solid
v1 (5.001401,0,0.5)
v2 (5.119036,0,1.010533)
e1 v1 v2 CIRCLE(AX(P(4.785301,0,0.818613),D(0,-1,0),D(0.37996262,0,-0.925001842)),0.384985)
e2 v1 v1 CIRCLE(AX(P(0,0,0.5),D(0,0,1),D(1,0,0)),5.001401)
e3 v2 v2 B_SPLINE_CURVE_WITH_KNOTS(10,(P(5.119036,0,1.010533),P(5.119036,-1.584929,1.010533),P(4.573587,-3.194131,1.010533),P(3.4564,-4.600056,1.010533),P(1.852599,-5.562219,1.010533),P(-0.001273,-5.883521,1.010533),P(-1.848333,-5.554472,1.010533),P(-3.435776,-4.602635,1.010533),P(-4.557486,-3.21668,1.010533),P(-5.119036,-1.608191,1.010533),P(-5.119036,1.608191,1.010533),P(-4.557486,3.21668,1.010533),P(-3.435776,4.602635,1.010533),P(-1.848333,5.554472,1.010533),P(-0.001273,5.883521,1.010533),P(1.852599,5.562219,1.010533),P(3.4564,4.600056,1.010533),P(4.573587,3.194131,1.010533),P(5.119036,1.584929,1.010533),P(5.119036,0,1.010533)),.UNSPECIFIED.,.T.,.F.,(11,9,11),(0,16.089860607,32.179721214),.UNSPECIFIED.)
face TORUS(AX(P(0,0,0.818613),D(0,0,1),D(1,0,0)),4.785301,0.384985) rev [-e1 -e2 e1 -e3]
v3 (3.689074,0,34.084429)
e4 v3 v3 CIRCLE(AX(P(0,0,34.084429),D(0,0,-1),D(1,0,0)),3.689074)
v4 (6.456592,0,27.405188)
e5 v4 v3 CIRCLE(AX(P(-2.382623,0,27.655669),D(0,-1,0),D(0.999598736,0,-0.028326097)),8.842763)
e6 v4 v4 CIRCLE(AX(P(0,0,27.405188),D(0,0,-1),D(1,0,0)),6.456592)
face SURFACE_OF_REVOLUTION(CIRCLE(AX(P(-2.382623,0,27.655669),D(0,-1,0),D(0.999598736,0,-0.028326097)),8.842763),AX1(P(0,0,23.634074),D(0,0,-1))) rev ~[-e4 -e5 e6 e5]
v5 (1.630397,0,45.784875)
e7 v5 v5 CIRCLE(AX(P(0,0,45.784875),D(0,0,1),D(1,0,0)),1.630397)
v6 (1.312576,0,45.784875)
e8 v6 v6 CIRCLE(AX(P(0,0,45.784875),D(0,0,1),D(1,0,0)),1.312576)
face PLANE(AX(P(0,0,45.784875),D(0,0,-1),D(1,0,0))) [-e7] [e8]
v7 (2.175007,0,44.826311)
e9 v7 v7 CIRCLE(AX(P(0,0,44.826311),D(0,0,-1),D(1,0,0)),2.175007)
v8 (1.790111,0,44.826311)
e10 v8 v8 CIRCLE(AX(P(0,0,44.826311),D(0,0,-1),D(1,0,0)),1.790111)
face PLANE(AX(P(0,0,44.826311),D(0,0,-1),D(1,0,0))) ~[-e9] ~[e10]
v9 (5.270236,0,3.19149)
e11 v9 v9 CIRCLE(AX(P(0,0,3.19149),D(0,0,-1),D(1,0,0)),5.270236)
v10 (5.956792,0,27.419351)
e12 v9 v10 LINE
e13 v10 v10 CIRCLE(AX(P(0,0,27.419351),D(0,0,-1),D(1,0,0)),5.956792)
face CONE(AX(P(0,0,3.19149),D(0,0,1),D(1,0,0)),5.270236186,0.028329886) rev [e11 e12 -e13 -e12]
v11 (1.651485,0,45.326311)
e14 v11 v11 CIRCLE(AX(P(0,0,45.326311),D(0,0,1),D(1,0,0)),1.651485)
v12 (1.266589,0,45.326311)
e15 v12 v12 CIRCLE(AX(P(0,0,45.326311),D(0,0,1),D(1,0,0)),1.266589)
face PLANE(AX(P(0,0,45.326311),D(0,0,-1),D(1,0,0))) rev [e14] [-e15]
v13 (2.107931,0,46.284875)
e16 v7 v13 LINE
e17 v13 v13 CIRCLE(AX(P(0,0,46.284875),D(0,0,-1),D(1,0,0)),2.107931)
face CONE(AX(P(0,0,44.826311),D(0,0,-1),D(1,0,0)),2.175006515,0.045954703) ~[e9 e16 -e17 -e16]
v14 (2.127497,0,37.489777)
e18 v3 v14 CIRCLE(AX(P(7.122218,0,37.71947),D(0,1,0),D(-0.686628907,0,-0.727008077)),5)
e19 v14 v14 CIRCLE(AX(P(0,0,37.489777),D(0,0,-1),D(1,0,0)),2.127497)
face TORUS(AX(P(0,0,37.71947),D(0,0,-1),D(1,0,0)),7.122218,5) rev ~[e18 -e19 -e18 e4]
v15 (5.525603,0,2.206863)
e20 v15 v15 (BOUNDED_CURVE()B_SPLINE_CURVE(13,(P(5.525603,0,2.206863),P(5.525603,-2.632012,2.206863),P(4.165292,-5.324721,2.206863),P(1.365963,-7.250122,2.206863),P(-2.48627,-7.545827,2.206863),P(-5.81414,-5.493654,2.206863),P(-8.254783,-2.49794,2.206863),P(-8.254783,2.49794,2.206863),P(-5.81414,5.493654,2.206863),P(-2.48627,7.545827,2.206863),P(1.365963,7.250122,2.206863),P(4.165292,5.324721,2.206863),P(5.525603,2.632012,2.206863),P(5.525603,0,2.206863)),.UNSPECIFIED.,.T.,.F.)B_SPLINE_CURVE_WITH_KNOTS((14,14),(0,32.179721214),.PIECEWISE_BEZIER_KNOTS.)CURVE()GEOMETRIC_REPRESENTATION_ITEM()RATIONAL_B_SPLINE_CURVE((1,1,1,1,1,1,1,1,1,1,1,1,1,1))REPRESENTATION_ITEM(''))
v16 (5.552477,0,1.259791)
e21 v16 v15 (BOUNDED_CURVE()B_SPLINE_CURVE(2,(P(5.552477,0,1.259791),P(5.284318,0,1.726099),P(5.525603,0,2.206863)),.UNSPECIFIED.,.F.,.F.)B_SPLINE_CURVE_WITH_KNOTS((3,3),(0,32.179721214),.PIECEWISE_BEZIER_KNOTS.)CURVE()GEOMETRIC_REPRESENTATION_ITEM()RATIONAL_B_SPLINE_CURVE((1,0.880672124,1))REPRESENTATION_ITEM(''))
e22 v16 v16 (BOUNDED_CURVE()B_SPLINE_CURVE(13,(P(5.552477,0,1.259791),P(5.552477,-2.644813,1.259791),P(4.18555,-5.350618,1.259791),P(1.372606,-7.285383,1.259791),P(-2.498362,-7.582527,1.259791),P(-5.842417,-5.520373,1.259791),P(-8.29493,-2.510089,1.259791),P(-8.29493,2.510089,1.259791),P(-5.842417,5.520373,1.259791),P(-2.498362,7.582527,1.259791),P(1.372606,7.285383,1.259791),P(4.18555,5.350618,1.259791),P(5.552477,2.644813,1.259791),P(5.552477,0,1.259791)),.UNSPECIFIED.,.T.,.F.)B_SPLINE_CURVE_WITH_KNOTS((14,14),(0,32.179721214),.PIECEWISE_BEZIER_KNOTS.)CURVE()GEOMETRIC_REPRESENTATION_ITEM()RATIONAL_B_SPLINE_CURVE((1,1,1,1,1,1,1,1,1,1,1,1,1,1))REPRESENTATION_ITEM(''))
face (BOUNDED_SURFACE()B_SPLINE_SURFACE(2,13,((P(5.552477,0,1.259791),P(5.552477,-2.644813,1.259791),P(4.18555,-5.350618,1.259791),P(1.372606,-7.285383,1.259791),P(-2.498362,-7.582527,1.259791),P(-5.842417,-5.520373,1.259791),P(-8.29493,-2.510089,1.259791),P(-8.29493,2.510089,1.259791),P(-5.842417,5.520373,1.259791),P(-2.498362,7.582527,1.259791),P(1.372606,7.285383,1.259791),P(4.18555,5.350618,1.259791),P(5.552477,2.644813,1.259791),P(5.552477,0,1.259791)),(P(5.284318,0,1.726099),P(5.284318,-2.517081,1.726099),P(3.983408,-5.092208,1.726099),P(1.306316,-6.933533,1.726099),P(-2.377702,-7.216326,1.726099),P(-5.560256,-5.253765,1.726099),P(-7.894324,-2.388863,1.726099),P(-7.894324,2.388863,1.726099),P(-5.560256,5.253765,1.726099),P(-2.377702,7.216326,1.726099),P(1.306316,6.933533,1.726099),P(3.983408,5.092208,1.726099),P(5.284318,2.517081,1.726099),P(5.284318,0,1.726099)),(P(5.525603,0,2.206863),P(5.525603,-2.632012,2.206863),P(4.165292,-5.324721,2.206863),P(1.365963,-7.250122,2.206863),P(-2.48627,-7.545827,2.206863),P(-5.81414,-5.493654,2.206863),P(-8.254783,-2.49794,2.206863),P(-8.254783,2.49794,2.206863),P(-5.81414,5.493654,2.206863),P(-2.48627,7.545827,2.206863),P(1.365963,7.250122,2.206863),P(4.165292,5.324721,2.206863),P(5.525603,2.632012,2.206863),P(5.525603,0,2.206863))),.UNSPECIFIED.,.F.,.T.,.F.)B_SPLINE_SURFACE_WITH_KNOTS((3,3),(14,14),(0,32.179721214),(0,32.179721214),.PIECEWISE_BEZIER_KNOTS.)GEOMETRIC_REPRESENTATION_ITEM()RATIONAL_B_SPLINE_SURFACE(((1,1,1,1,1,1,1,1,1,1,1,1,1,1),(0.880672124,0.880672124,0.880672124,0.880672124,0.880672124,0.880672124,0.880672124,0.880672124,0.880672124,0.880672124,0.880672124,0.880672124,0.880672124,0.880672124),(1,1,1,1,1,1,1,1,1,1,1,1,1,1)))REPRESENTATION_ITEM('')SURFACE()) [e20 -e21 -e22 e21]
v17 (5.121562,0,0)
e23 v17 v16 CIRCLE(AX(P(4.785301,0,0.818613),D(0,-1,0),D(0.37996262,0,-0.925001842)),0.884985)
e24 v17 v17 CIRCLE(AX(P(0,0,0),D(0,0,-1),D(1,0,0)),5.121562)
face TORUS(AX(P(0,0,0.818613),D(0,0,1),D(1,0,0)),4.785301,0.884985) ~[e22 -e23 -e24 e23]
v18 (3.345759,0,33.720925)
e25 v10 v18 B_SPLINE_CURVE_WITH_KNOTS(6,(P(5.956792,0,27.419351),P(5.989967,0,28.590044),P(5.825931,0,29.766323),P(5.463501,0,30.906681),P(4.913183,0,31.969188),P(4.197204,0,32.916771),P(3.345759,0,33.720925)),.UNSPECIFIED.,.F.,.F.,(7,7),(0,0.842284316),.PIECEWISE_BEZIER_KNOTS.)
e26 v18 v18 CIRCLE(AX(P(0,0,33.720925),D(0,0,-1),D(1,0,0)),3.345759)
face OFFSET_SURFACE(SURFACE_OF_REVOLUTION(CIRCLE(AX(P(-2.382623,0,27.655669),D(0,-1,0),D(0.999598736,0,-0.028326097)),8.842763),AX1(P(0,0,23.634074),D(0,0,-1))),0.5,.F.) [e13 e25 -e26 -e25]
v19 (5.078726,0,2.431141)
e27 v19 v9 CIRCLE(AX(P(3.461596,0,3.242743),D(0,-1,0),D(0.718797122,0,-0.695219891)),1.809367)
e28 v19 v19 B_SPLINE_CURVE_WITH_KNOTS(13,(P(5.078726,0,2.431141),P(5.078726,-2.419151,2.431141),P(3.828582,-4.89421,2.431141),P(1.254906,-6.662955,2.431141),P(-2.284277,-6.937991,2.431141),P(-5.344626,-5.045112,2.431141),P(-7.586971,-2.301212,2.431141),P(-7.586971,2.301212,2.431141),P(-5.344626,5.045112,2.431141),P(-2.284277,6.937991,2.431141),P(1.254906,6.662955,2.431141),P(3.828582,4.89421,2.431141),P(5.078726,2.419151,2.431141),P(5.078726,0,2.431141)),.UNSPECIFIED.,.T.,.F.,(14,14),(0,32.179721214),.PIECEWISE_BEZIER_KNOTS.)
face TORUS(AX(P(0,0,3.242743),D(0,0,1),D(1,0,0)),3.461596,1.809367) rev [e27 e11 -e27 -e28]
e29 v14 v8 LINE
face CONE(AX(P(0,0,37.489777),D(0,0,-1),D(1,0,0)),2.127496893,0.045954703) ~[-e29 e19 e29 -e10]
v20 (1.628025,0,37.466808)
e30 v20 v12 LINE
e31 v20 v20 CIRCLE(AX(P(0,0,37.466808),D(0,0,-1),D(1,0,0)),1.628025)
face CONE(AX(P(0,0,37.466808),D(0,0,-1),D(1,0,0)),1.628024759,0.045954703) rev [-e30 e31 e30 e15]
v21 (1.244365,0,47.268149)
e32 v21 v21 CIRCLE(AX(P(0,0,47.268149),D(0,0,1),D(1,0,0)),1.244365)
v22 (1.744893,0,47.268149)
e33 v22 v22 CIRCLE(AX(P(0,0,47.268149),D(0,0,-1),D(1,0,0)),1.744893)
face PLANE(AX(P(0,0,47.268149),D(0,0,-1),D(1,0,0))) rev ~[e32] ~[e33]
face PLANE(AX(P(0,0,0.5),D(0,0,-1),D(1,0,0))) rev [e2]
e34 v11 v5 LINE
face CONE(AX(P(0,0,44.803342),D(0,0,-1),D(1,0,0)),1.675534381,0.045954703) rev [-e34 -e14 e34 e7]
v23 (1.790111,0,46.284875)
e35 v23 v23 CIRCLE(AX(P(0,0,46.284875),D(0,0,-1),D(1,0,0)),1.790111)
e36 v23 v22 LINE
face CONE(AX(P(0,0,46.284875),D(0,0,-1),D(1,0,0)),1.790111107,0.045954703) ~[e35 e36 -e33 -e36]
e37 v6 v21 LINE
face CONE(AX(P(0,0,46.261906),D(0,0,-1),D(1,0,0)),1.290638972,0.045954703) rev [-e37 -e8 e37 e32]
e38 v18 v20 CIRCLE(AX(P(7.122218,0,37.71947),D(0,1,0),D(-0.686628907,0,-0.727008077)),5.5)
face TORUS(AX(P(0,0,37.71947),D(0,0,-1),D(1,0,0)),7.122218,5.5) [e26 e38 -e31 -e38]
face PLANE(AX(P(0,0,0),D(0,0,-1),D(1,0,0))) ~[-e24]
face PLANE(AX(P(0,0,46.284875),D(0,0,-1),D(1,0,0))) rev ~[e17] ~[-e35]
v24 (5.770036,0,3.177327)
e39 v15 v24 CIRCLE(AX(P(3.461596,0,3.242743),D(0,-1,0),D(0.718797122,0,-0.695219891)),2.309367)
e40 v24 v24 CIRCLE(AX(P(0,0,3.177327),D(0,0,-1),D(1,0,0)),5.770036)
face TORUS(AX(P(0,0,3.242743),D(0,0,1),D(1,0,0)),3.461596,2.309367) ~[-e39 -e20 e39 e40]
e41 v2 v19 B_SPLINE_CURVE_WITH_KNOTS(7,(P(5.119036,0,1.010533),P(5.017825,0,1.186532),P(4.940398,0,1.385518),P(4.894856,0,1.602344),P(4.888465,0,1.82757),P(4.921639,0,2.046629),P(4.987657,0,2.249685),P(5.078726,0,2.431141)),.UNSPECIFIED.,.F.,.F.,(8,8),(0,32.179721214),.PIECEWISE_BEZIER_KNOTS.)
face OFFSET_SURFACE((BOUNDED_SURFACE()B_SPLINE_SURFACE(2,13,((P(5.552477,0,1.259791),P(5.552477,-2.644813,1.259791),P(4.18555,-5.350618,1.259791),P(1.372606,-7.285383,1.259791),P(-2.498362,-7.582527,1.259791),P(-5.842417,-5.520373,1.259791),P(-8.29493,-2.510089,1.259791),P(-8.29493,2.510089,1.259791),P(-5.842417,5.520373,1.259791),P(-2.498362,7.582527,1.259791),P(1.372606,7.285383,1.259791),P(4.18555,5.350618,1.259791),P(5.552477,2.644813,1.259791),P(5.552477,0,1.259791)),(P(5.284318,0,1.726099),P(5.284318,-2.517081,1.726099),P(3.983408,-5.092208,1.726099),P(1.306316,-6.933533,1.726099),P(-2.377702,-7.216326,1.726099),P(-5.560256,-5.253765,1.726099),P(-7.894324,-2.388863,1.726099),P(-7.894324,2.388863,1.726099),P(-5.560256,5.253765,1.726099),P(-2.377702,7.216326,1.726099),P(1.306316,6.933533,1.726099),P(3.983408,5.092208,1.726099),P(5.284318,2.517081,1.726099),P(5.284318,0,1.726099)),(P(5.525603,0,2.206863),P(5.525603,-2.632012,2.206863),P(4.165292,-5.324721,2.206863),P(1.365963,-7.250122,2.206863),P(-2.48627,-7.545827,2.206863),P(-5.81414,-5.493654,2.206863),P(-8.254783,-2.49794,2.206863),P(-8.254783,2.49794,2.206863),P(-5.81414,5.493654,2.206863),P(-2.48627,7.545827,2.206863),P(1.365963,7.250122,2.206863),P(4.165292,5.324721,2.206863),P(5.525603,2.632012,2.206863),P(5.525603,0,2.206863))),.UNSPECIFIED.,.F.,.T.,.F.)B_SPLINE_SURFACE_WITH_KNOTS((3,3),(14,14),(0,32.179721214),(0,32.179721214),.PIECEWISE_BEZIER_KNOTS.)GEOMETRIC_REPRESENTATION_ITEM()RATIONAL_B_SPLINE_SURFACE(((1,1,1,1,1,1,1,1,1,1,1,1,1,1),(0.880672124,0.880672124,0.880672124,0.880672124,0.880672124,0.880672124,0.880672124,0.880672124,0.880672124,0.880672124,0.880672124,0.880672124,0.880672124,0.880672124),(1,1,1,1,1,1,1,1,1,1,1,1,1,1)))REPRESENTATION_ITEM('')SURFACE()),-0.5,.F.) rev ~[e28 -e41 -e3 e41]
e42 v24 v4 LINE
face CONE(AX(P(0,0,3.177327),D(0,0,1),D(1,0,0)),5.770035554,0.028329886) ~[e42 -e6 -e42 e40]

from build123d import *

# Parameters (mm, degrees)
F2_R = 1
F3_T = -0.5


with BuildPart() as f1:
    # F0 (on Front) → F1 (revolve)
    with BuildSketch(Plane.XZ):
        with BuildLine():
            Line((1.744893219, 47.2681485116), (0, 47.2681485116))
            Line((0, 47.2681485116), (0, 0))
            Line((0, 0), (5.1215616986, 0))
            ThreePointArc((5.1215616986, 0), (5.6702853456, 0.8186125558), (5.1215616986, 1.6372251117))
            ThreePointArc((5.1215616986, 1.6372251117), (5.5899847523, 2.3465653626), (5.7700355537, 3.1773273367))
            Line((5.7700355537, 3.1773273367), (6.4565917837, 27.4051882573))
            ThreePointArc((6.4565917837, 27.4051882573), (5.7866417171, 31.0405728949), (3.6890737014, 34.0844294905))
            ThreePointArc((3.6890737014, 34.0844294905), (2.5772947918, 35.6353223548), (2.127496893, 37.4897772264))
            Line((2.127496893, 37.4897772264), (1.7901111066, 44.8263114386))
            Line((1.7901111066, 44.8263114386), (2.1750065152, 44.8263114386))
            Line((2.1750065152, 44.8263114386), (2.1079314457, 46.2848747853))
            Line((2.1079314457, 46.2848747853), (1.7901111066, 46.2848747853))
            Line((1.7901111066, 46.2848747853), (1.744893219, 47.2681485116))
        make_face()
    revolve(axis=Axis((0, 0, 23.6340742558), (0, 0, -1)))

    # F2
    f2_edges = [f1.edges().sort_by_distance(p)[0] for p in [
        (-5.121562, 0, 1.637225),
    ]]
    fillet(f2_edges, radius=F2_R)

    # F3
    f3_openings = [f1.faces().sort_by_distance(p)[0] for p in [
        (0, 0, 47.268149),
    ]]
    offset(amount=F3_T, openings=f3_openings, kind=Kind.INTERSECTION)


solid = f1.part
